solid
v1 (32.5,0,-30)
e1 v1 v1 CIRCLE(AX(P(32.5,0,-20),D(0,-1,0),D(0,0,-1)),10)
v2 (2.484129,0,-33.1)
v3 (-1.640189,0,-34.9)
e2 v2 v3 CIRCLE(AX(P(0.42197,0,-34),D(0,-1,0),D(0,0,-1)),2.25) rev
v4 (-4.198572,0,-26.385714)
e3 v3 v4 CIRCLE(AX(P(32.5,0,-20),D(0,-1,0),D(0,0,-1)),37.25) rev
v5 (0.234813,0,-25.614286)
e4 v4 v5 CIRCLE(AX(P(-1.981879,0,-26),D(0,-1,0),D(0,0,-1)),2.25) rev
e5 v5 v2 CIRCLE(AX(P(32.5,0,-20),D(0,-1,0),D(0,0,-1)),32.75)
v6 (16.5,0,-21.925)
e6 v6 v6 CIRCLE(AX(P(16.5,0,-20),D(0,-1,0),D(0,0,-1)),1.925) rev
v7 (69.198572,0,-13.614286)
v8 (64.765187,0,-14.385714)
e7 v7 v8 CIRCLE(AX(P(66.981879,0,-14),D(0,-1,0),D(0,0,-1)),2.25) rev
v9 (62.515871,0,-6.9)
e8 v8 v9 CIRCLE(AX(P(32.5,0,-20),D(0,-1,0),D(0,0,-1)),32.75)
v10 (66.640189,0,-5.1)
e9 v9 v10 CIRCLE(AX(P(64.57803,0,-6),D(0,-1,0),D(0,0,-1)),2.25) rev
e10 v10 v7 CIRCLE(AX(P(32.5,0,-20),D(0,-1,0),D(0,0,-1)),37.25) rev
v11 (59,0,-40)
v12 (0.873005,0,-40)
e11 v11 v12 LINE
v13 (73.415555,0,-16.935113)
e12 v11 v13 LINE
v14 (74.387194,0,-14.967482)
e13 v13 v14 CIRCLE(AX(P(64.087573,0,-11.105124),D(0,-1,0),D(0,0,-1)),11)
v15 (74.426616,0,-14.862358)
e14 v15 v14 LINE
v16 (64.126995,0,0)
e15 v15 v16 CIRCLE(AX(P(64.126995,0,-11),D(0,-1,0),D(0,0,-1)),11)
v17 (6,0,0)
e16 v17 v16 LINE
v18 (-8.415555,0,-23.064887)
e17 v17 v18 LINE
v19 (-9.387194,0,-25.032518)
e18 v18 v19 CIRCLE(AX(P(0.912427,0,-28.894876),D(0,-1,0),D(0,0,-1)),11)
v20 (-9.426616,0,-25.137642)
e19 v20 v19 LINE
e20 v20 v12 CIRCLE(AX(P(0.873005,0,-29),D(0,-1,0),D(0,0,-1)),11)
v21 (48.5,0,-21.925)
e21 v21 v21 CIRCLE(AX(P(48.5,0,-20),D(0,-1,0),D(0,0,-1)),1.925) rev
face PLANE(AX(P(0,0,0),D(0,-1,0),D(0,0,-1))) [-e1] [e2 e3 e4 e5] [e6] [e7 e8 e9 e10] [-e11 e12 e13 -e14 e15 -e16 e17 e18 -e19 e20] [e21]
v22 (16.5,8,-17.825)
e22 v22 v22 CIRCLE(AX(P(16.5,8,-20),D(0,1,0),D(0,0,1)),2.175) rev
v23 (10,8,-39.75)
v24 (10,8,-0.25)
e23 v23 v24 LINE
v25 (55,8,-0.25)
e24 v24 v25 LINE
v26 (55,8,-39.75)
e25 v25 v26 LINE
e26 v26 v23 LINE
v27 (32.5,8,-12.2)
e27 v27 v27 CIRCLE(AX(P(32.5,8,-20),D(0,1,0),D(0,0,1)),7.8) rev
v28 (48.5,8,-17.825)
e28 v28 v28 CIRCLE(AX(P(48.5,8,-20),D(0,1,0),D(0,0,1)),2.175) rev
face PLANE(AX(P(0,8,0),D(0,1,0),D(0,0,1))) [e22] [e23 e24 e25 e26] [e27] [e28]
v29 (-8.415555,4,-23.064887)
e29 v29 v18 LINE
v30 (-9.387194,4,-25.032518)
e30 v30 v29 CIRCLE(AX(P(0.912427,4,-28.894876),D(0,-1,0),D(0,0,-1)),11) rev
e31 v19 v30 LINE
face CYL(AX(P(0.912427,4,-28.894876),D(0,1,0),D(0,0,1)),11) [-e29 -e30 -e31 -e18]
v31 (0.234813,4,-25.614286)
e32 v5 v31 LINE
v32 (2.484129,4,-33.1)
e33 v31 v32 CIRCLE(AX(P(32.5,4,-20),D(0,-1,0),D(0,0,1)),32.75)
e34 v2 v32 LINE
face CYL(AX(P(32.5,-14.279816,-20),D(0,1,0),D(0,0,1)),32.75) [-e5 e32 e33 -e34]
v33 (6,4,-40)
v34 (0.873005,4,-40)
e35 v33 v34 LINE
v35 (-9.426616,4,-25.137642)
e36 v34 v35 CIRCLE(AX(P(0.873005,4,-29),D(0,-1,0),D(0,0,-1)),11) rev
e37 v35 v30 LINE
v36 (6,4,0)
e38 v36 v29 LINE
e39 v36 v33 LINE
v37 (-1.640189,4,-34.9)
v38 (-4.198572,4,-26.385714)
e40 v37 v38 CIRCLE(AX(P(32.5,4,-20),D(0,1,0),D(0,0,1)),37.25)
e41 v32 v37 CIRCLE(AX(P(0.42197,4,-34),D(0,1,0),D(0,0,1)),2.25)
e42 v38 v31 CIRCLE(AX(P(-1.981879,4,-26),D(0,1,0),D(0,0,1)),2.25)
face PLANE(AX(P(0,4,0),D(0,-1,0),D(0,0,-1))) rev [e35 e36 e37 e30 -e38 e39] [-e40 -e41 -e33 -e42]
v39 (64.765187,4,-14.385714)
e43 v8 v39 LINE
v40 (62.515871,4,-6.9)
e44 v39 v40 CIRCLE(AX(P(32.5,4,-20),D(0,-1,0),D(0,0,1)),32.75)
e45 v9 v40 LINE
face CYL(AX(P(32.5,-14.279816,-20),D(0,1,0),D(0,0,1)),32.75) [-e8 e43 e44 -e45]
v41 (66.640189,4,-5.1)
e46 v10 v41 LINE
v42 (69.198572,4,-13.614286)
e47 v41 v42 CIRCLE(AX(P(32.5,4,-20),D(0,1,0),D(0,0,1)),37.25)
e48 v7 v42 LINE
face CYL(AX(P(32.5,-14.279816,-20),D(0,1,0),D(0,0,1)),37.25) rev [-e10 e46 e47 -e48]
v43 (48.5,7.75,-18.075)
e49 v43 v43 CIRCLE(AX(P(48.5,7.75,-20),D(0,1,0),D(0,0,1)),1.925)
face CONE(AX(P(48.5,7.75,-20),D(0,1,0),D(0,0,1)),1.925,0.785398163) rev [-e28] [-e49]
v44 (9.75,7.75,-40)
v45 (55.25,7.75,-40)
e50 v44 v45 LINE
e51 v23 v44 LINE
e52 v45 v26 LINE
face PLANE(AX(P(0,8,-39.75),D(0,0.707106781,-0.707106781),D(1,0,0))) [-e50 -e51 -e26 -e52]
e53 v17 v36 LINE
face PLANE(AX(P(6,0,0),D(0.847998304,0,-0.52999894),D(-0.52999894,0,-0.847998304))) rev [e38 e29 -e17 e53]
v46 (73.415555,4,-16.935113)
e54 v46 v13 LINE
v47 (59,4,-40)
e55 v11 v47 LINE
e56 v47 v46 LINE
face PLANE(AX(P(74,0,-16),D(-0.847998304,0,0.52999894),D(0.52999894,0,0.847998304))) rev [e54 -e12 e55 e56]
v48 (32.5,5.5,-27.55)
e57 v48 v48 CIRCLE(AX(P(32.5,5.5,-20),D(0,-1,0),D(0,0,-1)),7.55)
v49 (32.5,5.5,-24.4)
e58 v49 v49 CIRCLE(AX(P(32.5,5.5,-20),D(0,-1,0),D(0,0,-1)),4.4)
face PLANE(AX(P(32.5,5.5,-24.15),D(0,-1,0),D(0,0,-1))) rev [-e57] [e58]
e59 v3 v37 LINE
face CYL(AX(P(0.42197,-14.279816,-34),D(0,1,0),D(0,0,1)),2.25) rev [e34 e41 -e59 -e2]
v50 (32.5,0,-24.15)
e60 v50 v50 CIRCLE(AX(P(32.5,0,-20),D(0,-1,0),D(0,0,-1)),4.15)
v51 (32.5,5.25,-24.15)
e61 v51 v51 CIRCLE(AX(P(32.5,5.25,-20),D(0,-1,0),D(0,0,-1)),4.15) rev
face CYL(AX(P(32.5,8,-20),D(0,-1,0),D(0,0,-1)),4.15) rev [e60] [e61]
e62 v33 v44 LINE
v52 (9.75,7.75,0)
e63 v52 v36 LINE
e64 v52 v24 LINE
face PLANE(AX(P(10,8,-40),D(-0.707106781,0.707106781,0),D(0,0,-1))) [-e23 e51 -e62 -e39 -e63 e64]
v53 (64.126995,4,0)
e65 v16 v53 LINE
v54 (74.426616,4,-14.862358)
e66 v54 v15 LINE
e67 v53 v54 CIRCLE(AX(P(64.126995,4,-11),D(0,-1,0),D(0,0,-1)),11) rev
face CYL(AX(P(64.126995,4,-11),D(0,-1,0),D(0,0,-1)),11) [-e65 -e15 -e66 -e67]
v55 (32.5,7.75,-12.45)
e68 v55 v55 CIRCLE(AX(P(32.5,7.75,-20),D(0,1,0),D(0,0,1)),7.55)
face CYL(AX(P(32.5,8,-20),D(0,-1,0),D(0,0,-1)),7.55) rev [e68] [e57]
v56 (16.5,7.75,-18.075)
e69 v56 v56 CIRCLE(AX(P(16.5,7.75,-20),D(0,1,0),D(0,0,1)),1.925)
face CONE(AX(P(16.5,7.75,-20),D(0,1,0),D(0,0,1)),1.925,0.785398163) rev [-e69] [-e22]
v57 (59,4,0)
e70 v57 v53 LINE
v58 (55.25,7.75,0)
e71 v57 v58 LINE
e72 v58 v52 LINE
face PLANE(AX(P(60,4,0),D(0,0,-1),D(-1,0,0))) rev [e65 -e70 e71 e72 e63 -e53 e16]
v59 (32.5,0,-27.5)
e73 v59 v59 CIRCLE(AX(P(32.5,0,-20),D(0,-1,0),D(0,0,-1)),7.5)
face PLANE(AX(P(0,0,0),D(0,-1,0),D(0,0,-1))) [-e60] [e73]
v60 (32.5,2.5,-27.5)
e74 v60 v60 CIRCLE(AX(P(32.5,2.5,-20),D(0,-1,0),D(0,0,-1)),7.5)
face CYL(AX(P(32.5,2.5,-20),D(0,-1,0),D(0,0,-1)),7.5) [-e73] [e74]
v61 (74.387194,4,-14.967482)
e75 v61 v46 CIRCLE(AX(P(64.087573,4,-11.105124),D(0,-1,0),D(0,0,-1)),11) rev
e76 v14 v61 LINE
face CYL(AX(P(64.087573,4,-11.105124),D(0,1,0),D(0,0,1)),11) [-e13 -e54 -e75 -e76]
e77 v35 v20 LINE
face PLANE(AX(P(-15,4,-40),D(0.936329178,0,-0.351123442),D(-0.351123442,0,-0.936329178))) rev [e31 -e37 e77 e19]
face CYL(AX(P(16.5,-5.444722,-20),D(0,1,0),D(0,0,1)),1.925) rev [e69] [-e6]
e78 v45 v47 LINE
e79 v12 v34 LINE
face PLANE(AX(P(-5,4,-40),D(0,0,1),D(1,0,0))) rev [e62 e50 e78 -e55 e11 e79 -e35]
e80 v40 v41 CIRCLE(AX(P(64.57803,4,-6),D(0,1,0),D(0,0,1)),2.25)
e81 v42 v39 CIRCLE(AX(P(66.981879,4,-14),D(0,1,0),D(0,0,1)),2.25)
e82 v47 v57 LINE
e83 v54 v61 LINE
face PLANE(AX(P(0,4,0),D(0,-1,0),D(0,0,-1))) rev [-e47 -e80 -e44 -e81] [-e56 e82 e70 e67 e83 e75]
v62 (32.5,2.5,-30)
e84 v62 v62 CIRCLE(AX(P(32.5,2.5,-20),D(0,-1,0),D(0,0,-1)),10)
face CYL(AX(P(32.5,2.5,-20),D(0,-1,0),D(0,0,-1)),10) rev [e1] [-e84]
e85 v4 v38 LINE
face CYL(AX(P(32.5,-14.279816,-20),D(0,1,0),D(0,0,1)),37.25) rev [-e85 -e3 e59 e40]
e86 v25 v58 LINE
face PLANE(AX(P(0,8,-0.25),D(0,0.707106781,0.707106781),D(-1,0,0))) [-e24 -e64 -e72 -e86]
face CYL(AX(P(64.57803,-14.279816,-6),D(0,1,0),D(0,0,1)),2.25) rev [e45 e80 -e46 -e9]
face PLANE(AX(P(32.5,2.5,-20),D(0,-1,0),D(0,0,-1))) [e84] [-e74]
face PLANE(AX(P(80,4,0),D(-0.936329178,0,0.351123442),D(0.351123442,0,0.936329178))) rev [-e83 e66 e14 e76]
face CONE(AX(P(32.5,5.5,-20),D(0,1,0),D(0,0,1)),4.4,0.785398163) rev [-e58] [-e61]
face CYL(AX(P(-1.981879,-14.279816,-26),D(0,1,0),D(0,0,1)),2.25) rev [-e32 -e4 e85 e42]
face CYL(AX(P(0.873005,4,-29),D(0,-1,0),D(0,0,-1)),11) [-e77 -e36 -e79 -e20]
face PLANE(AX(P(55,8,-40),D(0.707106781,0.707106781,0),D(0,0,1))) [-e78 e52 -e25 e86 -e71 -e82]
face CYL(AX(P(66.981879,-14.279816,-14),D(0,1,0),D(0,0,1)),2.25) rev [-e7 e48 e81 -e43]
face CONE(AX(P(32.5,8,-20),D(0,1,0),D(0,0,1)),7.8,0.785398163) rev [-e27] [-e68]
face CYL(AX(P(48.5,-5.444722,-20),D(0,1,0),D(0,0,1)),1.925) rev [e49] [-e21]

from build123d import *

# Parameters (mm, degrees)
BASE_DEPTH                 = 4
SKETCH2_W                  = 45
SKETCH2_H                  = 40
TPS_STANDOFF_DEPTH         = 4
SKETCH4_R                  = 1.925
TPS_SCREW_HOLES_DEPTH      = 8
MOUNTING_SCREW_HOLES_DEPTH = 4
SKETCH7_R                  = 10
SKETCH7_R_2                = 7.5
O_RING_CUT_DEPTH           = 2.5
CHAMFER1_SIZE              = 4
CHAMFER3_SIZE              = 0.25
CUT_EXTRUDE3_DEPTH         = 90.532117142
CUT_EXTRUDE3_DEPTH_BACK    = 90.532117142
FILLET4_R                  = 11


with BuildPart() as part:
    # Sketch1 → Base (new body)
    with BuildSketch(Plane(origin=(0, 0, 0), x_dir=(1, 0, 0), z_dir=(0, 1, 0))):
        Polygon((-5, 40), (65, 40), (80, 0), (60, 0), (0, 0), (-15, 40), align=None)
    extrude(amount=BASE_DEPTH)

    # Sketch2 → TPS Standoff (add)
    with BuildSketch(Plane(origin=(0, 4, 0), x_dir=(1, 0, 0), z_dir=(0, 1, 0))):
        with Locations((32.5, 20)):
            Rectangle(SKETCH2_W, SKETCH2_H)
    extrude(amount=TPS_STANDOFF_DEPTH)

    # Sketch4 → TPS Screw Holes (cut)
    with BuildSketch(Plane(origin=(0, 8, 0), x_dir=(1, 0, 0), z_dir=(0, 1, 0))):
        with Locations(Location((48.5, 20, 0), (0, 0, 270))):
            Circle(SKETCH4_R)
        with Locations(Location((16.5, 20, 0), (0, 0, 270))):
            Circle(SKETCH4_R)
    extrude(amount=-TPS_SCREW_HOLES_DEPTH, mode=Mode.SUBTRACT)

    # Sketch5 → Mounting Screw Holes (cut)
    with BuildSketch(Plane(origin=(0, 4, 0), x_dir=(1, 0, 0), z_dir=(0, 1, 0))):
        with BuildLine():
            ThreePointArc((-1.640188927, 34.9), (-3.174301135, 30.719456076), (-4.19857154, 26.385714286))
            ThreePointArc((-4.19857154, 26.385714286), (-2.367593585, 23.783307759), (0.234812942, 25.614285714))
            ThreePointArc((0.234812942, 25.614285714), (1.135345982, 29.424488228), (2.484129198, 33.1))
            ThreePointArc((2.484129198, 33.1), (1.321970135, 36.062159063), (-1.640188927, 34.9))
        make_face()
        with BuildLine():
            ThreePointArc((66.640188927, 5.1), (68.174301135, 9.280543924), (69.19857154, 13.614285714))
            ThreePointArc((69.19857154, 13.614285714), (67.367593585, 16.216692241), (64.765187058, 14.385714286))
            ThreePointArc((64.765187058, 14.385714286), (63.864654018, 10.575511772), (62.515870802, 6.9))
            ThreePointArc((62.515870802, 6.9), (63.678029865, 3.937840937), (66.640188927, 5.1))
        make_face()
    extrude(amount=-MOUNTING_SCREW_HOLES_DEPTH, mode=Mode.SUBTRACT)

    # Sketch6 → TPS Shaft Bore Cut (revolve, cut)
    with BuildSketch(Plane.YZ.offset(32.5)):
        Polygon((8, -20), (0, -20), (0, -24.15), (5.5, -24.15), (5.5, -27.55), (8, -27.55), align=None)
    revolve(axis=Axis((32.5, 8, -20), (0, 1, 0)), mode=Mode.SUBTRACT)

    # Sketch7 → O-Ring Cut (cut)
    with BuildSketch(Plane.XZ):
        with Locations(Location((32.5, -20, 0), (0, 0, 270))):
            Circle(SKETCH7_R)
        with Locations(Location((32.5, -20, 0), (0, 0, 270))):
            Circle(SKETCH7_R_2, mode=Mode.SUBTRACT)
    extrude(amount=-O_RING_CUT_DEPTH, mode=Mode.SUBTRACT)

    # Chamfer1
    chamfer1_edges = [part.edges().sort_by_distance(p)[0] for p in [
        (55, 4, -20),
        (10, 4, -20),
    ]]
    chamfer(chamfer1_edges, length=CHAMFER1_SIZE - 0.0001)  # a hair under: the kernel refuses the full size

    # Chamfer3
    chamfer3_edges = [part.edges().sort_by_distance(p)[0] for p in [
        (32.5, 8, 0),
        (32.5, 8, -40),
        (48.5, 8, -21.925),
        (16.5, 8, -21.925),
        (32.5, 8, -12.45),
        (32.5, 5.5, -15.85),
    ]]
    chamfer(chamfer3_edges, length=CHAMFER3_SIZE)

    # Sketch9 → Cut-Extrude3 (cut, two sides: drawn at the far end of the back side and taken through both)
    with BuildSketch(Plane(origin=(0, 4, 0), x_dir=(1, 0, 0), z_dir=(0, 1, 0)).offset(-CUT_EXTRUDE3_DEPTH_BACK)):
        Polygon((6, 0), (-9, 24), (0, 0), align=None)
        Polygon((59, 40), (65, 40), (74, 16), align=None)
    extrude(amount=CUT_EXTRUDE3_DEPTH + CUT_EXTRUDE3_DEPTH_BACK, mode=Mode.SUBTRACT)

    # Fillet4
    fillet4_edges = [part.edges().sort_by_distance(p)[0] for p in [
        (-15, 2, -40),
        (80, 2, 0),
        (-9, 2, -24),
        (74, 2, -16),
    ]]
    fillet(fillet4_edges, radius=FILLET4_R)


solid = part.part
